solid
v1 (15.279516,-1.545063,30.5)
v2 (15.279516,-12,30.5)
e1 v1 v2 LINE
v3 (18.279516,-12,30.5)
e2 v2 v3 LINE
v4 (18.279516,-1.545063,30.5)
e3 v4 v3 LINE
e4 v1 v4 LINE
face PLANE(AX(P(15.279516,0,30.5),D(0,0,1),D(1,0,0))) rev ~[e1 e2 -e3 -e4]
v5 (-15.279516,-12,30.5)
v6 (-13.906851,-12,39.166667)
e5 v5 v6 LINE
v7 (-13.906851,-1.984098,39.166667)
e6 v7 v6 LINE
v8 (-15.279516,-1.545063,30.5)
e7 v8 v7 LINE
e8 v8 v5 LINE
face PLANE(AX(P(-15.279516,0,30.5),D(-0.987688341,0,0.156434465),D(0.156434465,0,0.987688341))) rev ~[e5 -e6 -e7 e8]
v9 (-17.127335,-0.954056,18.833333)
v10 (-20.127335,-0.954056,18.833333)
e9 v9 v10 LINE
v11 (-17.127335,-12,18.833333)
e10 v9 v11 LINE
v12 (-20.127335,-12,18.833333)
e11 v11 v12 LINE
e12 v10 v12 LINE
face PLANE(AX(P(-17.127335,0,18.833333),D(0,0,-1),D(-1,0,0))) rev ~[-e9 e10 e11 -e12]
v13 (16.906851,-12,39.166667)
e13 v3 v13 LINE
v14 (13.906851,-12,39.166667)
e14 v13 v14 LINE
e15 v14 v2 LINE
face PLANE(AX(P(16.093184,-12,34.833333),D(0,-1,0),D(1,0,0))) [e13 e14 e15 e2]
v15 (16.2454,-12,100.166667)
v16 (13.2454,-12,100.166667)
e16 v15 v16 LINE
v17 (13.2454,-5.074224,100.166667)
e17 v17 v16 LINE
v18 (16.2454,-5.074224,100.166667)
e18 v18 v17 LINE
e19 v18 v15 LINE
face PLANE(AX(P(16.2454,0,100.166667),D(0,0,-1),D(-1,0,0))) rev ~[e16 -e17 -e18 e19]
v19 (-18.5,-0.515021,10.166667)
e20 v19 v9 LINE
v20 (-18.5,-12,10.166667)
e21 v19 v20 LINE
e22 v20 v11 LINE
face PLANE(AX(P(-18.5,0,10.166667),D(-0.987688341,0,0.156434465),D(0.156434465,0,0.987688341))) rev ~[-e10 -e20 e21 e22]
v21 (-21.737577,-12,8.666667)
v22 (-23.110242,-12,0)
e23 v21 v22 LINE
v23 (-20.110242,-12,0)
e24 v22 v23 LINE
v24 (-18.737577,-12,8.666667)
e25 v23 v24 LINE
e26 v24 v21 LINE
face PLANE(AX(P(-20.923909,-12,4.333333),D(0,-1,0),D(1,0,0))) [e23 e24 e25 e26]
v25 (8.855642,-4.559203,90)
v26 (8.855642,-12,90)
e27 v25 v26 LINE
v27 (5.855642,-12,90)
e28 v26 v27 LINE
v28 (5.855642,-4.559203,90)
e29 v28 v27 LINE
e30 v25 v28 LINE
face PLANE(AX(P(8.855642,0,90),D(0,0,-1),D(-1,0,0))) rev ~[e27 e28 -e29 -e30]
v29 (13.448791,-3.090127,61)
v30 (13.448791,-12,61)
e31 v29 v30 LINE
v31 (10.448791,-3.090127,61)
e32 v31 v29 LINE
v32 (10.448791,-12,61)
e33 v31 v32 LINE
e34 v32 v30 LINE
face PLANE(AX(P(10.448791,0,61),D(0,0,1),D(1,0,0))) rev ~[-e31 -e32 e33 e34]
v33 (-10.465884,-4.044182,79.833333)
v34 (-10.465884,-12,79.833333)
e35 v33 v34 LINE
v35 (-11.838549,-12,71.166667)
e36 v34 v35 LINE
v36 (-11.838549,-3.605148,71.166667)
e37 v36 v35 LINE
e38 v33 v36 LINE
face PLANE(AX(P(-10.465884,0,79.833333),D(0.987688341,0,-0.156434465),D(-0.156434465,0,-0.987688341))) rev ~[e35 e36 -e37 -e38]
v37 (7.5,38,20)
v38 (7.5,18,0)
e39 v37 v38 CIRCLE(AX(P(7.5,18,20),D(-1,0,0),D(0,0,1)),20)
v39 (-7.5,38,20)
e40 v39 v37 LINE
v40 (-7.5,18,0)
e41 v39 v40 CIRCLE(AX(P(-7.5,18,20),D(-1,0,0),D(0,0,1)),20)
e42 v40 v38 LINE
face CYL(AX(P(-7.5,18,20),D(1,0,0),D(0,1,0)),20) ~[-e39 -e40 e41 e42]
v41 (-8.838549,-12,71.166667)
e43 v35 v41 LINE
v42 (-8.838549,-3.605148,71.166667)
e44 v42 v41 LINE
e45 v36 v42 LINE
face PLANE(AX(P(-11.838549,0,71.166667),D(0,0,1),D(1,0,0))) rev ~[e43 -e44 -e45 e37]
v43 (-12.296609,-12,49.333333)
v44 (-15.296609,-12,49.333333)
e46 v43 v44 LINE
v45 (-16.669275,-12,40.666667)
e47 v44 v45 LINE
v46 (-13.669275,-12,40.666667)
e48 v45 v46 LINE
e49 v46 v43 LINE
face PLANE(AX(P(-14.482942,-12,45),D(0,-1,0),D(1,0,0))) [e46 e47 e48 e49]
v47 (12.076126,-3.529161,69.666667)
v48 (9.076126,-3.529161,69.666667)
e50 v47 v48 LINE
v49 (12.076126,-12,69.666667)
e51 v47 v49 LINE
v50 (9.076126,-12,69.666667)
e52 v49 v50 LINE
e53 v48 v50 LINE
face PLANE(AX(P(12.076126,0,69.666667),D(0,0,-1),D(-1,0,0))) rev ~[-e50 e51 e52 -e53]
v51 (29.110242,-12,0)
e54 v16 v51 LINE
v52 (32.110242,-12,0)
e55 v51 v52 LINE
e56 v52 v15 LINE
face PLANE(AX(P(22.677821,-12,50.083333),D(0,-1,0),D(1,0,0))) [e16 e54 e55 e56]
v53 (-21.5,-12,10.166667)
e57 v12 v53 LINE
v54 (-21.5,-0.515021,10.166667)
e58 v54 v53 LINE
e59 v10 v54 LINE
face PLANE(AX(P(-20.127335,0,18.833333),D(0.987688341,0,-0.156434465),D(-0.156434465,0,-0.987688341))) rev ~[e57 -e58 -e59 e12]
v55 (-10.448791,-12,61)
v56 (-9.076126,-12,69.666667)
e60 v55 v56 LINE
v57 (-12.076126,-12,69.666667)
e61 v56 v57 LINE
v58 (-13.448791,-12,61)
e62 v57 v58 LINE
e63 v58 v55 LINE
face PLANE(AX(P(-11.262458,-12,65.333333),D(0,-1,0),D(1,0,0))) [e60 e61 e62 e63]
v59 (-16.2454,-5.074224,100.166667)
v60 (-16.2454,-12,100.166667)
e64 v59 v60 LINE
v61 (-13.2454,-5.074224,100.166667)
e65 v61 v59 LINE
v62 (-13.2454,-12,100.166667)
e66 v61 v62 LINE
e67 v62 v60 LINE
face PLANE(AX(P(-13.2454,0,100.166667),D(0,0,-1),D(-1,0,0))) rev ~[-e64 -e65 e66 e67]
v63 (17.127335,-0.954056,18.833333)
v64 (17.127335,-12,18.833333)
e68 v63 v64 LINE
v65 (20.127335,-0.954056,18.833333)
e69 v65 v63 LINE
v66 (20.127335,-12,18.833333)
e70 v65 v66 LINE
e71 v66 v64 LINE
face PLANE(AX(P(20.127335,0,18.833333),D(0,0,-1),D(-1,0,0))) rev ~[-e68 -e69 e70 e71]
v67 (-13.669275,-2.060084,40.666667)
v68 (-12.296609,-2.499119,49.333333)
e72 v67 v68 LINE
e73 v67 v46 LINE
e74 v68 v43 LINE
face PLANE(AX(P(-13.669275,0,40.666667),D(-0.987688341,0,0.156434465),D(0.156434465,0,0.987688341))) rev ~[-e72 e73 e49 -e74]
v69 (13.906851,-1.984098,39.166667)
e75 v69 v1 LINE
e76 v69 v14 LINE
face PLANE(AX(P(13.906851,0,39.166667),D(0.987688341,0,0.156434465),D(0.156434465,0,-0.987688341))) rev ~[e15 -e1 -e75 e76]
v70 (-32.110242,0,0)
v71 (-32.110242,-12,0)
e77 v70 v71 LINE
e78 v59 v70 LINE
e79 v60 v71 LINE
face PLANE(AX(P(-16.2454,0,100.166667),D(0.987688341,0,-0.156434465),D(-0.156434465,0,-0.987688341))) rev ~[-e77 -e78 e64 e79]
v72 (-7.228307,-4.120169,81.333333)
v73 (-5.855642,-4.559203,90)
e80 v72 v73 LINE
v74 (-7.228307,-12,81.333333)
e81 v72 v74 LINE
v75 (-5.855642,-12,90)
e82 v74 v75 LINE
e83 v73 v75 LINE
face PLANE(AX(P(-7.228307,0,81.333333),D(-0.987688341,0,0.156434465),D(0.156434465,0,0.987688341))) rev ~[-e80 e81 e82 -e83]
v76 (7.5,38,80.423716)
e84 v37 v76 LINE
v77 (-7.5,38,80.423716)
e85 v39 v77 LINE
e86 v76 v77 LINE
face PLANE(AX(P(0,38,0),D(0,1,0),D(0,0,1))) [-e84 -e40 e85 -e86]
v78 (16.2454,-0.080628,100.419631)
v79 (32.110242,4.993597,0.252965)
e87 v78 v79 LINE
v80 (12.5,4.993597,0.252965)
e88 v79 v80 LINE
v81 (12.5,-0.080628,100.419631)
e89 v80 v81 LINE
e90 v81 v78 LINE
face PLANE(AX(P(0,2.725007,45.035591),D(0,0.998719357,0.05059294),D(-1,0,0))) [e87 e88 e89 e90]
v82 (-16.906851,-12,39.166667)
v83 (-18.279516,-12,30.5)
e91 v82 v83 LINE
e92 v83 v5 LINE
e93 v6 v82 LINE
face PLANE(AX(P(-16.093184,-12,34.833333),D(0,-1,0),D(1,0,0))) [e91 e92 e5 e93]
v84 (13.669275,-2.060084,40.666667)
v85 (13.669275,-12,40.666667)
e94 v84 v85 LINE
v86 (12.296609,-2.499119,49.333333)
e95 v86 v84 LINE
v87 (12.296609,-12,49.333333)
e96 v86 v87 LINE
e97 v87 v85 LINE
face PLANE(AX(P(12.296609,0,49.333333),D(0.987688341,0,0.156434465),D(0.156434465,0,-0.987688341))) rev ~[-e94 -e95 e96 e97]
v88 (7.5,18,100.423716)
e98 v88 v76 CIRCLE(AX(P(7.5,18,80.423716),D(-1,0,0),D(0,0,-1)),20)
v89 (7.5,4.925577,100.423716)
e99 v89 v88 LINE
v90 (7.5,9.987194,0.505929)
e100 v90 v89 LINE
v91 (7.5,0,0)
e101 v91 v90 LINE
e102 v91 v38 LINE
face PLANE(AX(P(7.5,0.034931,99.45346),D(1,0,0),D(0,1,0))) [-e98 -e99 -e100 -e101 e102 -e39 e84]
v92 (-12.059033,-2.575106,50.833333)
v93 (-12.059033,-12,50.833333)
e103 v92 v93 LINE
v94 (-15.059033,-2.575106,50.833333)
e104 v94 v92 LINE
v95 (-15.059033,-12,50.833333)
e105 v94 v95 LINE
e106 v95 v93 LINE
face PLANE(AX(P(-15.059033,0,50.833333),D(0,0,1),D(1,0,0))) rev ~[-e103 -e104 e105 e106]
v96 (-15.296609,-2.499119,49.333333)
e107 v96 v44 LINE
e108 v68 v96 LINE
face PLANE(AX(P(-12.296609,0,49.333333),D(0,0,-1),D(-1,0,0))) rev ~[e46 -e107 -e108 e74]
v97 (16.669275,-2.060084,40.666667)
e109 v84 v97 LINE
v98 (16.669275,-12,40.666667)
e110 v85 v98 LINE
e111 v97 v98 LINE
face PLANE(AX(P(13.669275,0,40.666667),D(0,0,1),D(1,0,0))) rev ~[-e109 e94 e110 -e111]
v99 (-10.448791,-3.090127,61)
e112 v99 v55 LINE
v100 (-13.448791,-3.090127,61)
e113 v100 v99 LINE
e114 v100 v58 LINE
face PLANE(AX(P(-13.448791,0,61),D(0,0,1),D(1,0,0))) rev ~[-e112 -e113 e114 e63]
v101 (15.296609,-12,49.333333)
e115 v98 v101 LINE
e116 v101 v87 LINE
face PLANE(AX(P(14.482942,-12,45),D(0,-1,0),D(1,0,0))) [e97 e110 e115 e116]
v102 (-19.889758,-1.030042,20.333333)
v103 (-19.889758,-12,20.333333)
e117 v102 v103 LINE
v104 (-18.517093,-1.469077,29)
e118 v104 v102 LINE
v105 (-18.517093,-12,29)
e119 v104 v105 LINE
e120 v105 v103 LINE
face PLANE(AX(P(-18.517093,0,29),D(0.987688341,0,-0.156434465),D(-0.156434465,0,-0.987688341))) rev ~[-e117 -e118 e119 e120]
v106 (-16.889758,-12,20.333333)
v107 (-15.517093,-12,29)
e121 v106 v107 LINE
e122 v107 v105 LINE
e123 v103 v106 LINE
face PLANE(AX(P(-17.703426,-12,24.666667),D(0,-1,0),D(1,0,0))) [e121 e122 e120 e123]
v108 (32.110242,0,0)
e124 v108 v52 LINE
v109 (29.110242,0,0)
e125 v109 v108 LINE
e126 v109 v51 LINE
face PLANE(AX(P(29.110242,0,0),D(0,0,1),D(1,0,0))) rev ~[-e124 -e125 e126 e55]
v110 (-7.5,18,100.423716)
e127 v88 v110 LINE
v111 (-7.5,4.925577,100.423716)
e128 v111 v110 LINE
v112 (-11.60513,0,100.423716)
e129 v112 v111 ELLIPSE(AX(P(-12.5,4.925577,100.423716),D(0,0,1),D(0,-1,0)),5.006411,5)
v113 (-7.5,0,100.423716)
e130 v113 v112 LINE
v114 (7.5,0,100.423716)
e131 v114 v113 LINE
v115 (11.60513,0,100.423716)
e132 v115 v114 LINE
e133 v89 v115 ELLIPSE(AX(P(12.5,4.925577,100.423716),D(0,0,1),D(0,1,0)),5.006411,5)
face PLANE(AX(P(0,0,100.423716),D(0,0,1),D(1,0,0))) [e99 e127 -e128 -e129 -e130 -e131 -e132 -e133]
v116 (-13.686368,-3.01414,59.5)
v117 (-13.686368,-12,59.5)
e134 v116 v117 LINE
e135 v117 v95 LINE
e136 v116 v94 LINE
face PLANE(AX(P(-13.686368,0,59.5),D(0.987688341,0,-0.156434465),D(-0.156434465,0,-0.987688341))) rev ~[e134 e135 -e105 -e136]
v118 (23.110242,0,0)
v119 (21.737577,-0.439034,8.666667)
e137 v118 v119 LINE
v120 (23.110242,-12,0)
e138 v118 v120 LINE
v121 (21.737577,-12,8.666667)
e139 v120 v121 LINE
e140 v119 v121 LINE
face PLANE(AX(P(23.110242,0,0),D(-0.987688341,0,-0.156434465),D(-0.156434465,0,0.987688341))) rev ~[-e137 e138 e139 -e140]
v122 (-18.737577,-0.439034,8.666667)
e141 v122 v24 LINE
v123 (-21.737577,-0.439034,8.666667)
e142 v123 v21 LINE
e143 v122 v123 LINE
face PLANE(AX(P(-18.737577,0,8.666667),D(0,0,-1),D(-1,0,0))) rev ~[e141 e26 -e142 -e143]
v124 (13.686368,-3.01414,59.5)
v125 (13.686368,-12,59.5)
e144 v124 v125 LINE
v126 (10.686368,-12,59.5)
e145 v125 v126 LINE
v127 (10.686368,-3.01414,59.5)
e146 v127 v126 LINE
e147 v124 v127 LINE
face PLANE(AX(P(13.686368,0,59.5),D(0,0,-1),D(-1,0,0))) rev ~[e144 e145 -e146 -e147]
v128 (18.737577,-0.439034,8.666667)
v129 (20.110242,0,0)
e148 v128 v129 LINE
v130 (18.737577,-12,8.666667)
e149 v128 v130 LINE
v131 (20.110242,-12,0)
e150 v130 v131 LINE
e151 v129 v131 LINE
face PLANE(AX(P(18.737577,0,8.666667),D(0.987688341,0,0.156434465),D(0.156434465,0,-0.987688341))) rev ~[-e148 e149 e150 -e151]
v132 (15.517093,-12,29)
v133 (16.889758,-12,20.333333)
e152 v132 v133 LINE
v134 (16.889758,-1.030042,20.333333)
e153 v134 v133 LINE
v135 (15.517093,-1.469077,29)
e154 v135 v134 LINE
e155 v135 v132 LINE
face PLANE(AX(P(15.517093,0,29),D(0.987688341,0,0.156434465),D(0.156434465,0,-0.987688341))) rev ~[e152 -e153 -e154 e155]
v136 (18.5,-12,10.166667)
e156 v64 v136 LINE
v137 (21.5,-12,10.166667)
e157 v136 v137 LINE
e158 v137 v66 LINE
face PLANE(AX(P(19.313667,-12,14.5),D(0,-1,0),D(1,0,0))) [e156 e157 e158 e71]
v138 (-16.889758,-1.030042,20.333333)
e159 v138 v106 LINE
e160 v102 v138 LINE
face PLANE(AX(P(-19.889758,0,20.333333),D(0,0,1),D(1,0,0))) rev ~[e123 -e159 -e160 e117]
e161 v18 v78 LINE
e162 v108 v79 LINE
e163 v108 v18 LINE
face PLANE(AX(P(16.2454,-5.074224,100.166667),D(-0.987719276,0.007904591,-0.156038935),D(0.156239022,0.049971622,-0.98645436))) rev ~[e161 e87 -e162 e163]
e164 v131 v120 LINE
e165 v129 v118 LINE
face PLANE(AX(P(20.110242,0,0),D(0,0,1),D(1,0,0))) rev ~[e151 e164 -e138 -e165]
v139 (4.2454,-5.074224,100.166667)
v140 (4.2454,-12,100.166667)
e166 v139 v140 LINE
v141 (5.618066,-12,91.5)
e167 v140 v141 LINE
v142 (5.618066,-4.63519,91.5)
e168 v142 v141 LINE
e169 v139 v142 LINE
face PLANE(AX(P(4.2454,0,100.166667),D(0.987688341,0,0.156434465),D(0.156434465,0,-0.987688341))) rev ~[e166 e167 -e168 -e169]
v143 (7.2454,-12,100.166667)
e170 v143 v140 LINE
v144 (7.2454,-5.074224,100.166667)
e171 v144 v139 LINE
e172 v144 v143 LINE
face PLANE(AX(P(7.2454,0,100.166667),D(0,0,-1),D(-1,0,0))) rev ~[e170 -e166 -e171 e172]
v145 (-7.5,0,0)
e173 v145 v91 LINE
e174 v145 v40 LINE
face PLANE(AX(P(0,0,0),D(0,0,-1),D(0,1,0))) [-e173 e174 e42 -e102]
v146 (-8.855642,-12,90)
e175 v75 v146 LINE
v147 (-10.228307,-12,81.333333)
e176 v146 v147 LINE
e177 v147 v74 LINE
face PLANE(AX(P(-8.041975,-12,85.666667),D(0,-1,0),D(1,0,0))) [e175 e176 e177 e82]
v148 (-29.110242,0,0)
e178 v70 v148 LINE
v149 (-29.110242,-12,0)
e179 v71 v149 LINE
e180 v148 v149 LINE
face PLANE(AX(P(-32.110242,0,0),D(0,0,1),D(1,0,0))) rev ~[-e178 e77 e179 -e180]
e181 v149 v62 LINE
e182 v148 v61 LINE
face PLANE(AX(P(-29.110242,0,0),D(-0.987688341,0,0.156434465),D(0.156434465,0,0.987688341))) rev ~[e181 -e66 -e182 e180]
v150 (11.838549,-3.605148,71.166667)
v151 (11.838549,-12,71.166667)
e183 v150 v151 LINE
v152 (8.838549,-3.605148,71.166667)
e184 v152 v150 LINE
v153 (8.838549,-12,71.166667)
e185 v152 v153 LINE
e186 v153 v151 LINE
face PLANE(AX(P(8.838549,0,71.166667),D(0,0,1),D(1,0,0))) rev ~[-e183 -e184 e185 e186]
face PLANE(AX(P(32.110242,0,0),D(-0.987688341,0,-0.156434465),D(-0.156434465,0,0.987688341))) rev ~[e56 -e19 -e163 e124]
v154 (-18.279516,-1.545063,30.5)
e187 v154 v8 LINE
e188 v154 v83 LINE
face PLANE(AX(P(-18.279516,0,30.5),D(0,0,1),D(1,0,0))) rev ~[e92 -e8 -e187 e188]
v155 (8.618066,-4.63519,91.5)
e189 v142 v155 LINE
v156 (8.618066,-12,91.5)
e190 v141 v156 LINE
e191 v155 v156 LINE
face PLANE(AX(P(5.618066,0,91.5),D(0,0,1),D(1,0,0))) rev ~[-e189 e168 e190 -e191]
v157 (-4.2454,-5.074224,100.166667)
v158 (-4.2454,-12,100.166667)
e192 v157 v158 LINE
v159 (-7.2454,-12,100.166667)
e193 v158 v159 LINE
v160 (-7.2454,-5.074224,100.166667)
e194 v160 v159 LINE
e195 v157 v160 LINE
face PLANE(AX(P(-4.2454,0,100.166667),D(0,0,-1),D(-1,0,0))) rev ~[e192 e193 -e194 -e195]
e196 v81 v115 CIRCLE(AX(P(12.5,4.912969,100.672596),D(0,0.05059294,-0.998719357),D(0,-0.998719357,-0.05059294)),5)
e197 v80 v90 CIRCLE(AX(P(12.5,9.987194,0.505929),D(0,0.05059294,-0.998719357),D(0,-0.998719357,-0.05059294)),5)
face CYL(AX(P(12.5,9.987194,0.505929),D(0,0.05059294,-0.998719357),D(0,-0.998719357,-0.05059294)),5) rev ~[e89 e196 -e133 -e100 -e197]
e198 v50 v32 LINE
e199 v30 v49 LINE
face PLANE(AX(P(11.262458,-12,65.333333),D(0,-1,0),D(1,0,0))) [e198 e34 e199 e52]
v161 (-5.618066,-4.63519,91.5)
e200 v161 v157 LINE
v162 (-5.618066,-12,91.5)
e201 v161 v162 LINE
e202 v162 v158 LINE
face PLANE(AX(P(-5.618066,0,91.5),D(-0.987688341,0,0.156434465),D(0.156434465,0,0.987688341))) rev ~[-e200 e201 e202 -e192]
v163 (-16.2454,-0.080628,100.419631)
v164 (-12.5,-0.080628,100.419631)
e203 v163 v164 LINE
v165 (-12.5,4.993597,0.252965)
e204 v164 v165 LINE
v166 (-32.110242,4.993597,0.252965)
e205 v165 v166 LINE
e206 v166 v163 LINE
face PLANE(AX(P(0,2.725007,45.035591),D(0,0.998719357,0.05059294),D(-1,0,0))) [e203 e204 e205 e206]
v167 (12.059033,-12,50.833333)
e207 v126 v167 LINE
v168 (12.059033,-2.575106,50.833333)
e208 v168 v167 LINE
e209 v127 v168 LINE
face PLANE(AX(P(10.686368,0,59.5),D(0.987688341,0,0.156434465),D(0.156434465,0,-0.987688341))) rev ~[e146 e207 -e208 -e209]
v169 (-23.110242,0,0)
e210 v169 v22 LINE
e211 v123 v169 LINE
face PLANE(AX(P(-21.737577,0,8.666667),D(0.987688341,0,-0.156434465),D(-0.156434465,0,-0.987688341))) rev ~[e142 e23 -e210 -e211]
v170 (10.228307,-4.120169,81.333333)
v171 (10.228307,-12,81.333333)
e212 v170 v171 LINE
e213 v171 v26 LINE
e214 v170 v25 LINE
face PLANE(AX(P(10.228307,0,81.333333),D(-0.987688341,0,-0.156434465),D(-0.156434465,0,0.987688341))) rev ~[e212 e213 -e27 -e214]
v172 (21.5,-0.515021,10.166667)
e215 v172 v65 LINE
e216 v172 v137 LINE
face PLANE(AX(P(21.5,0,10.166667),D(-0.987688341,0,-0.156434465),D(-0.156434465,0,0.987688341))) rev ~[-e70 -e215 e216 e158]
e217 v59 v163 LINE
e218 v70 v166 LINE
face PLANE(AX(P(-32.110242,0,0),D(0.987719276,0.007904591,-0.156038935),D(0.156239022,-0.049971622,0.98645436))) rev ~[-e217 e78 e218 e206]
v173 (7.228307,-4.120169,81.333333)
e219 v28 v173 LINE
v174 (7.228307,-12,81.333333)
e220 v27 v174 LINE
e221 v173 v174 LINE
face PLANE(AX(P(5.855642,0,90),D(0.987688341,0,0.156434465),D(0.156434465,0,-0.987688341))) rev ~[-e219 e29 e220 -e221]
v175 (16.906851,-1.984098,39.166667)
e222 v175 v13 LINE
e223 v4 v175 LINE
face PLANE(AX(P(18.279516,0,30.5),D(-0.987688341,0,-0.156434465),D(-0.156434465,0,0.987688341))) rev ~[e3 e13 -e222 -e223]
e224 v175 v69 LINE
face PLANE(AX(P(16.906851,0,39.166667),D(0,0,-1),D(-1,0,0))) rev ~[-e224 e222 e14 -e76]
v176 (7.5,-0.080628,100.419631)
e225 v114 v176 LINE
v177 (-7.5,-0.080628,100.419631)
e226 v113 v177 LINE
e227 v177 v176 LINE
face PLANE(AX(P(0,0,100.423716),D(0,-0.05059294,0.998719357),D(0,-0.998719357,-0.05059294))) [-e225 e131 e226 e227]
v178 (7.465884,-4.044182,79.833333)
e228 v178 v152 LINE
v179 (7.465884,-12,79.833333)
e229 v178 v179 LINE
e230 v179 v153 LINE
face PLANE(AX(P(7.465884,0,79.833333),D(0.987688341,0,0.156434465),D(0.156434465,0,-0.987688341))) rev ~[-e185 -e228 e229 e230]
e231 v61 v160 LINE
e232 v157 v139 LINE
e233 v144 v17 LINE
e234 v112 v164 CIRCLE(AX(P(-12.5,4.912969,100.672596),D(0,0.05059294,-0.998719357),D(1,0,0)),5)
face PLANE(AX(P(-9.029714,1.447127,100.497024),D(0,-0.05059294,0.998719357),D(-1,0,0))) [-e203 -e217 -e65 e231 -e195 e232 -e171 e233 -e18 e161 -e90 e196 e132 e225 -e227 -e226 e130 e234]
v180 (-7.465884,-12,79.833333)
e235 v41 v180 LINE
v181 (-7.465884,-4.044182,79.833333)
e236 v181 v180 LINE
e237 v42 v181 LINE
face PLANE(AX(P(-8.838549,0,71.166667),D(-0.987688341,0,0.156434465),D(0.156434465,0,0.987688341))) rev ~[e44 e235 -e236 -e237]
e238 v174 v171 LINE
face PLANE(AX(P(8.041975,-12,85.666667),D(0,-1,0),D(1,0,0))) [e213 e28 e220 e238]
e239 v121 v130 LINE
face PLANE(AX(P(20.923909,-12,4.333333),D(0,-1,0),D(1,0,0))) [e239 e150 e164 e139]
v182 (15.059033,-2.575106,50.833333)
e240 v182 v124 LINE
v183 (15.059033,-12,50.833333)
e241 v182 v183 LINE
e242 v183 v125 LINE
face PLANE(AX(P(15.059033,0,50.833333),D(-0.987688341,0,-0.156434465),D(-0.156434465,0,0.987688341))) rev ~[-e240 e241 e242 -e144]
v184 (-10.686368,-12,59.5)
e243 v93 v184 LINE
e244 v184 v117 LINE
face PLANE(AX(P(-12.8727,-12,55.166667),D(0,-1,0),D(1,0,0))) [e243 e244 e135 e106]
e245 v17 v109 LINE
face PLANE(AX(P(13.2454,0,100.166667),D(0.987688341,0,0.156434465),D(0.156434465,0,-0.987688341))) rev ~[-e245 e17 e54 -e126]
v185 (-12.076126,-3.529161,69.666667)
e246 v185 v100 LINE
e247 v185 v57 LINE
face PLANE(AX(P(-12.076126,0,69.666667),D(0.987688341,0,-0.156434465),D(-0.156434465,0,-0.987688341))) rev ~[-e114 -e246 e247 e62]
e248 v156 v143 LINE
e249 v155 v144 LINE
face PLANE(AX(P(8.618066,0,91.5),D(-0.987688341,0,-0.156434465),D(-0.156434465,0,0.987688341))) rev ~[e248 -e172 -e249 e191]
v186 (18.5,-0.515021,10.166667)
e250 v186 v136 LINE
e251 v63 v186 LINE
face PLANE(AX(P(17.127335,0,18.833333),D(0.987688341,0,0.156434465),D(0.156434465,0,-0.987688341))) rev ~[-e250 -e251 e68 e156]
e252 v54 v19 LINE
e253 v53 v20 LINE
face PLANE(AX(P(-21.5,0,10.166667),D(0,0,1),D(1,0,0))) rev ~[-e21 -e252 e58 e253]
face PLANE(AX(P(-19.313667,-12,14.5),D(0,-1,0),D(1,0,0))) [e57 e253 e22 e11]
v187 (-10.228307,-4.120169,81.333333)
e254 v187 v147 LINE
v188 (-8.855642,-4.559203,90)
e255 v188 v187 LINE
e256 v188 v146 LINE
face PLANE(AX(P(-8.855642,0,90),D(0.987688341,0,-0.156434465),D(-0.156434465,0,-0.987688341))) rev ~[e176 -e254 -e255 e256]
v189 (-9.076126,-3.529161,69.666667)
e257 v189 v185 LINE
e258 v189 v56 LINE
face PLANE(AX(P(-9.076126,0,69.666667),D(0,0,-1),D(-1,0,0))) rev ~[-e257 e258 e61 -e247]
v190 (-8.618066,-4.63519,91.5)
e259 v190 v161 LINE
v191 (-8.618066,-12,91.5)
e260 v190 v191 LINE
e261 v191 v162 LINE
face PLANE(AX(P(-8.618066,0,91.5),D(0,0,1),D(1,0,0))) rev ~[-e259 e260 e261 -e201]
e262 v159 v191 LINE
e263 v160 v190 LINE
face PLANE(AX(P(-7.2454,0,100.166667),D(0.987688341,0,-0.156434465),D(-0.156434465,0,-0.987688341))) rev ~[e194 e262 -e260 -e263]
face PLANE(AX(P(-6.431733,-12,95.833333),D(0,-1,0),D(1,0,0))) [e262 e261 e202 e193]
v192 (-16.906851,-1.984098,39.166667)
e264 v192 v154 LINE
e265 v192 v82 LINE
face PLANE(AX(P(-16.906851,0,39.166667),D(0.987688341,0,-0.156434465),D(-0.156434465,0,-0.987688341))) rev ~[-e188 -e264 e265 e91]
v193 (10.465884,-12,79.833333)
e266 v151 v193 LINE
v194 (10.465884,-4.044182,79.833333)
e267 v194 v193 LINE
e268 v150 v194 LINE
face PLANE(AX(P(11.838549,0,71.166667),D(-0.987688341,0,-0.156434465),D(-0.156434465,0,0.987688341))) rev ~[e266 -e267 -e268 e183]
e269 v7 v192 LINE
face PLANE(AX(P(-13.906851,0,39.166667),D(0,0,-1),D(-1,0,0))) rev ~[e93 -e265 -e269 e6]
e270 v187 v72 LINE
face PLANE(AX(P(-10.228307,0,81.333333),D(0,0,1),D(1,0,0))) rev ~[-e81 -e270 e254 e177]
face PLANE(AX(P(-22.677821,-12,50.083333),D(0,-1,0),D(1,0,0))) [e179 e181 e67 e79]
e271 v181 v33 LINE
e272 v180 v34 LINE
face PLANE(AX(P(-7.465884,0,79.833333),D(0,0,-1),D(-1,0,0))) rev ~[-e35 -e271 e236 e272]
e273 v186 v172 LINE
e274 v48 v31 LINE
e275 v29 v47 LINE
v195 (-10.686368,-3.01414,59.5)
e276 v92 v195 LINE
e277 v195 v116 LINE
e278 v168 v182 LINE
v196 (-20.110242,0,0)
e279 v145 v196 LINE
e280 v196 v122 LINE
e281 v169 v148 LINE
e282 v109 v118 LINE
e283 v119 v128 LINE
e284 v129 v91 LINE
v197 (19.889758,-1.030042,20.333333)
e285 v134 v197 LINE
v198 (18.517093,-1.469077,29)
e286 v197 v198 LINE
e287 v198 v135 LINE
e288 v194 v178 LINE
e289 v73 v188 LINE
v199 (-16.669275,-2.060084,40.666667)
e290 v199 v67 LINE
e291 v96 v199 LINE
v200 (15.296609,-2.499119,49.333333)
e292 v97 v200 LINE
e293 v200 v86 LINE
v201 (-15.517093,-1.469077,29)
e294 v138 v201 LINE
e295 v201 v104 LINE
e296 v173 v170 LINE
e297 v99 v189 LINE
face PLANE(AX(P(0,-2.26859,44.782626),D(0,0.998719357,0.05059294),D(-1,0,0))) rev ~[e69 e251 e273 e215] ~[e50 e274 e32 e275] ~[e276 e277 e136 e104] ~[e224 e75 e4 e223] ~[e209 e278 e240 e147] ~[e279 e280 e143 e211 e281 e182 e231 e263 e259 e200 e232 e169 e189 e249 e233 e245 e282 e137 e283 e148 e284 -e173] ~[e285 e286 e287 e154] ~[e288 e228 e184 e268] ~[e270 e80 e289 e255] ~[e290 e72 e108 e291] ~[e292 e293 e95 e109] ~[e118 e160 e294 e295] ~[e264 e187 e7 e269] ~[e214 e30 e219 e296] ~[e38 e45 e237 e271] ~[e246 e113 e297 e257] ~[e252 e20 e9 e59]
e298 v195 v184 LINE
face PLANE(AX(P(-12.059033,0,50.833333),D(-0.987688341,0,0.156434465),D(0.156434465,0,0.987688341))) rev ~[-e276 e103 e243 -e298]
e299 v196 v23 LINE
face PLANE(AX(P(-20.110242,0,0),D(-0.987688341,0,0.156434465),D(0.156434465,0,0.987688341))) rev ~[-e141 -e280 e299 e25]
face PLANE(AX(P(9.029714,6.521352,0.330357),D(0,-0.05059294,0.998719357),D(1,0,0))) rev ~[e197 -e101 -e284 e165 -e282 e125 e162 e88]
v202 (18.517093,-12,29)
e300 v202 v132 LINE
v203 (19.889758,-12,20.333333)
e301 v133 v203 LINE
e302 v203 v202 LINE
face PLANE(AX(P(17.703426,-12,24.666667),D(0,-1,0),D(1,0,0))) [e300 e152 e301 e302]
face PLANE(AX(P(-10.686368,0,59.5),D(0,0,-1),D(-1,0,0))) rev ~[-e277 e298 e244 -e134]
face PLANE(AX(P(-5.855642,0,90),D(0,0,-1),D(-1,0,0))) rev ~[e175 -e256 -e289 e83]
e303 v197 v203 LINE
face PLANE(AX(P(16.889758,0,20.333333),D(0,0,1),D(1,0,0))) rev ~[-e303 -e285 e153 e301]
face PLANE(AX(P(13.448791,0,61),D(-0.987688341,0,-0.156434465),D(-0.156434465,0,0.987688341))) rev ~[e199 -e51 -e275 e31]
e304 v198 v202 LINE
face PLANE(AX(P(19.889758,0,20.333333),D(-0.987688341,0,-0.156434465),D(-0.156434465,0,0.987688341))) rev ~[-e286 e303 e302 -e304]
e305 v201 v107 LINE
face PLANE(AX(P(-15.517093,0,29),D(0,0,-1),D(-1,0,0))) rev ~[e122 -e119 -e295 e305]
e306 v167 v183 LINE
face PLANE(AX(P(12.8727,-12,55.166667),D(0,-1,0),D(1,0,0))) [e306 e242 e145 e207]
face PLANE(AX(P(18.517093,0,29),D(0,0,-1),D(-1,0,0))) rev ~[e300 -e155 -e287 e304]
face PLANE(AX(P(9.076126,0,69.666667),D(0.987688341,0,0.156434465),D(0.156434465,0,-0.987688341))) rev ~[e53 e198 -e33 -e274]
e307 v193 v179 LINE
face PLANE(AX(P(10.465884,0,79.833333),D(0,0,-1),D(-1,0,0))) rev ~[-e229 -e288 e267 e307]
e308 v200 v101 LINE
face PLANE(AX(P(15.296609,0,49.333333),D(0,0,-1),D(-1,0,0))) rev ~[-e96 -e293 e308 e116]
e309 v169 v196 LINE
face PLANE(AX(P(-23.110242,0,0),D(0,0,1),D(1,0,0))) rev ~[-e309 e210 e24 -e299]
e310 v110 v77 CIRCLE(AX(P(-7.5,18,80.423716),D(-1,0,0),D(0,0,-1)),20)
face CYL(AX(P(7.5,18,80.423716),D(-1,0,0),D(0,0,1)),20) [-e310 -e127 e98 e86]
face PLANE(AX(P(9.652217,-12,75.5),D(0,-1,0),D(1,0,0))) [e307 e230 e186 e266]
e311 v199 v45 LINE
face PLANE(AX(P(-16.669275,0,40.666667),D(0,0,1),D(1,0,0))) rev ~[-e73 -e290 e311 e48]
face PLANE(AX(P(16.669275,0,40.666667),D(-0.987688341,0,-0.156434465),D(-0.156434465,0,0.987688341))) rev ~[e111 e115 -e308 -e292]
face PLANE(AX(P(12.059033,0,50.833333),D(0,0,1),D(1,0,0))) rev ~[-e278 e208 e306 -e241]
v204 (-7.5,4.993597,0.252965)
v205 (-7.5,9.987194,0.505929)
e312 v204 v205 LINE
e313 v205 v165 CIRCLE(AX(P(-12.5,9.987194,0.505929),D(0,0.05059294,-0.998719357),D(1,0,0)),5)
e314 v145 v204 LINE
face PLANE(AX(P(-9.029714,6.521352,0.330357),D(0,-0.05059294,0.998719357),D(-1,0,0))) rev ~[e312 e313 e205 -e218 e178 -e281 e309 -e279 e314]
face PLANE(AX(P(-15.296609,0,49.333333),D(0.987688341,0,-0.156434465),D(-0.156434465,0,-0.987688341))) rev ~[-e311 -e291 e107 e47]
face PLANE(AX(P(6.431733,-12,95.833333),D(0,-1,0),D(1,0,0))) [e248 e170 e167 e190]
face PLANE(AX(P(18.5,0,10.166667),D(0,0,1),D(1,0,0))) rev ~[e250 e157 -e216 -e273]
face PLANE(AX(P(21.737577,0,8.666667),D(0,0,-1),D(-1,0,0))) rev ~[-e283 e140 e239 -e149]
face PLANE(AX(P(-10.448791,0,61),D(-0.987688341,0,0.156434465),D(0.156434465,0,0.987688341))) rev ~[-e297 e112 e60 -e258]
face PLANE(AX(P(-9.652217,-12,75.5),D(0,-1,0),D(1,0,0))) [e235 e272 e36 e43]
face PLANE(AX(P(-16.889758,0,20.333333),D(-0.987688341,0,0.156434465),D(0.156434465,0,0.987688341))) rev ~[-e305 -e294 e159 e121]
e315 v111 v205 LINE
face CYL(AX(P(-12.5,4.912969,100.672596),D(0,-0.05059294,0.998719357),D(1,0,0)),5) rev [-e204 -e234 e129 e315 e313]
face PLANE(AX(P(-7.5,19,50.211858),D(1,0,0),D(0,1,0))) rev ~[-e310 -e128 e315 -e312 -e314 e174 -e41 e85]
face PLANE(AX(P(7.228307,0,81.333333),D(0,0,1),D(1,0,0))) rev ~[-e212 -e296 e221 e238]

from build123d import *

# Parameters (mm, degrees)
F1_DEPTH     = 12
F3_DEPTH     = 40
F5_DEPTH     = 5
F6_W         = 38
F6_H         = 100.4237157875
F7_DEPTH     = 7.5
F9_DEPTH     = 7.5
F10_T4_DEPTH = 100.2951088773
F10_T9_DEPTH = 100.2951088773
F11_R        = 20


# Not quite as in the source:
# - a fillet or chamfer that OpenCascade refuses, or shapes differently, is made with other operations: its cross-section is extruded or revolved along the edge and cut away or added


with BuildPart() as f1:
    # F0 (on Front) → F1 (new body)
    with BuildSketch(Plane.XZ):
        Polygon((-18.7375766605, 8.6666666667), (-21.7375766605, 8.6666666667), (-23.11024181, 0), (-20.11024181, 0), align=None)
    extrude(amount=F1_DEPTH)


with BuildPart() as f1b:
    # F0 (on Front) → F1, piece 2 (new body)
    with BuildSketch(Plane.XZ):
        Polygon((21.7375766605, 8.6666666667), (18.7375766605, 8.6666666667), (20.11024181, 0), (23.11024181, 0), align=None)
    extrude(amount=F1_DEPTH)


with BuildPart() as f1c:
    # F0 (on Front) → F1, piece 3 (new body)
    with BuildSketch(Plane.XZ):
        Polygon((-20.1273348505, 18.8333333333), (-21.5, 10.1666666667), (-18.5, 10.1666666667), (-17.1273348505, 18.8333333333), align=None)
    extrude(amount=F1_DEPTH)


with BuildPart() as f1d:
    # F0 (on Front) → F1, piece 4 (new body)
    with BuildSketch(Plane.XZ):
        Polygon((17.1273348505, 18.8333333333), (18.5, 10.1666666667), (21.5, 10.1666666667), (20.1273348505, 18.8333333333), align=None)
    extrude(amount=F1_DEPTH)


with BuildPart() as f1e:
    # F0 (on Front) → F1, piece 5 (new body)
    with BuildSketch(Plane.XZ):
        Polygon((-15.5170930406, 29), (-18.5170930406, 29), (-19.88975819, 20.3333333333), (-16.88975819, 20.3333333333), align=None)
    extrude(amount=F1_DEPTH)


with BuildPart() as f1f:
    # F0 (on Front) → F1, piece 6 (new body)
    with BuildSketch(Plane.XZ):
        Polygon((16.88975819, 20.3333333333), (19.88975819, 20.3333333333), (18.5170930406, 29), (15.5170930406, 29), align=None)
    extrude(amount=F1_DEPTH)


with BuildPart() as f1g:
    # F0 (on Front) → F1, piece 7 (new body)
    with BuildSketch(Plane.XZ):
        Polygon((-15.2966094206, 49.3333333333), (-16.6692745701, 40.6666666667), (-13.6692745701, 40.6666666667), (-12.2966094206, 49.3333333333), align=None)
    extrude(amount=F1_DEPTH)


with BuildPart() as f1h:
    # F0 (on Front) → F1, piece 8 (new body)
    with BuildSketch(Plane.XZ):
        Polygon((-10.6863676107, 59.5), (-13.6863676107, 59.5), (-15.0590327601, 50.8333333333), (-12.0590327601, 50.8333333333), align=None)
    extrude(amount=F1_DEPTH)


with BuildPart() as f1i:
    # F0 (on Front) → F1, piece 9 (new body)
    with BuildSketch(Plane.XZ):
        Polygon((-11.8385491402, 71.1666666667), (-8.8385491402, 71.1666666667), (-7.4658839907, 79.8333333333), (-10.4658839907, 79.8333333333), align=None)
    extrude(amount=F1_DEPTH)


with BuildPart() as f1j:
    # F0 (on Front) → F1, piece 10 (new body)
    with BuildSketch(Plane.XZ):
        Polygon((-5.8556421808, 90), (-8.8556421808, 90), (-10.2283073302, 81.3333333333), (-7.2283073302, 81.3333333333), align=None)
    extrude(amount=F1_DEPTH)


with BuildPart() as f1k:
    # F0 (on Front) → F1, piece 11 (new body)
    with BuildSketch(Plane.XZ):
        Polygon((-4.2454003708, 100.1666666667), (-7.2454003708, 100.1666666667), (-8.6180655203, 91.5), (-5.6180655203, 91.5), align=None)
    extrude(amount=F1_DEPTH)


with BuildPart() as f1l:
    # F0 (on Front) → F1, piece 12 (new body)
    with BuildSketch(Plane.XZ):
        Polygon((16.9068512306, 39.1666666667), (13.9068512306, 39.1666666667), (15.2795163801, 30.5), (18.2795163801, 30.5), align=None)
    extrude(amount=F1_DEPTH)


with BuildPart() as f1m:
    # F0 (on Front) → F1, piece 13 (new body)
    with BuildSketch(Plane.XZ):
        Polygon((15.2966094206, 49.3333333333), (12.2966094206, 49.3333333333), (13.6692745701, 40.6666666667), (16.6692745701, 40.6666666667), align=None)
    extrude(amount=F1_DEPTH)


with BuildPart() as f1n:
    # F0 (on Front) → F1, piece 14 (new body)
    with BuildSketch(Plane.XZ):
        Polygon((13.6863676107, 59.5), (10.6863676107, 59.5), (12.0590327601, 50.8333333333), (15.0590327601, 50.8333333333), align=None)
    extrude(amount=F1_DEPTH)


with BuildPart() as f1o:
    # F0 (on Front) → F1, piece 15 (new body)
    with BuildSketch(Plane.XZ):
        Polygon((10.4487909502, 61), (13.4487909502, 61), (12.0761258007, 69.6666666667), (9.0761258007, 69.6666666667), align=None)
    extrude(amount=F1_DEPTH)


with BuildPart() as f1p:
    # F0 (on Front) → F1, piece 16 (new body)
    with BuildSketch(Plane.XZ):
        Polygon((10.4658839907, 79.8333333333), (7.4658839907, 79.8333333333), (8.8385491402, 71.1666666667), (11.8385491402, 71.1666666667), align=None)
    extrude(amount=F1_DEPTH)


with BuildPart() as f1q:
    # F0 (on Front) → F1, piece 17 (new body)
    with BuildSketch(Plane.XZ):
        Polygon((8.8556421808, 90), (5.8556421808, 90), (7.2283073302, 81.3333333333), (10.2283073302, 81.3333333333), align=None)
    extrude(amount=F1_DEPTH)


with BuildPart() as f1r:
    # F0 (on Front) → F1, piece 18 (new body)
    with BuildSketch(Plane.XZ):
        Polygon((-13.9068512306, 39.1666666667), (-16.9068512306, 39.1666666667), (-18.2795163801, 30.5), (-15.2795163801, 30.5), align=None)
    extrude(amount=F1_DEPTH)


with BuildPart() as f1s:
    # F0 (on Front) → F1, piece 19 (new body)
    with BuildSketch(Plane.XZ):
        Polygon((-12.0761258007, 69.6666666667), (-13.4487909502, 61), (-10.4487909502, 61), (-9.0761258007, 69.6666666667), align=None)
    extrude(amount=F1_DEPTH)


with BuildPart() as f1t:
    # F0 (on Front) → F1, piece 20 (new body)
    with BuildSketch(Plane.XZ):
        Polygon((7.2454003708, 100.1666666667), (4.2454003708, 100.1666666667), (5.6180655203, 91.5), (8.6180655203, 91.5), align=None)
    extrude(amount=F1_DEPTH)


with BuildPart() as f1u:
    # F0 (on Front) → F1, piece 21 (new body)
    with BuildSketch(Plane.XZ):
        Polygon((-29.11024181, 0), (-13.2454003708, 100.1666666667), (-16.2454003708, 100.1666666667), (-32.11024181, 0), align=None)
    extrude(amount=F1_DEPTH)


with BuildPart() as f1v:
    # F0 (on Front) → F1, piece 22 (new body)
    with BuildSketch(Plane.XZ):
        Polygon((16.2454003708, 100.1666666667), (13.2454003708, 100.1666666667), (29.11024181, 0), (32.11024181, 0), align=None)
    extrude(amount=F1_DEPTH)


with BuildPart() as f3_tool:
    # F2 (on Right) → F3 (new body, symmetric)
    with BuildSketch(Plane.YZ):
        Polygon((-5.0742244334, 100.1666666667), (0, 0), (0, 100.1666666667), align=None)
    extrude(amount=F3_DEPTH, both=True)


with BuildPart() as f1_1:
    add(f1.part)

    # F3: cut by f3_tool
    add(f3_tool.part, mode=Mode.SUBTRACT)



with BuildPart() as f1b_1:
    add(f1b.part)

    # F3: cut by f3_tool
    add(f3_tool.part, mode=Mode.SUBTRACT)


with BuildPart() as f1c_1:
    add(f1c.part)

    # F3: cut by f3_tool
    add(f3_tool.part, mode=Mode.SUBTRACT)


with BuildPart() as f1d_1:
    add(f1d.part)

    # F3: cut by f3_tool
    add(f3_tool.part, mode=Mode.SUBTRACT)


with BuildPart() as f1e_1:
    add(f1e.part)

    # F3: cut by f3_tool
    add(f3_tool.part, mode=Mode.SUBTRACT)


with BuildPart() as f1f_1:
    add(f1f.part)

    # F3: cut by f3_tool
    add(f3_tool.part, mode=Mode.SUBTRACT)


with BuildPart() as f1g_1:
    add(f1g.part)

    # F3: cut by f3_tool
    add(f3_tool.part, mode=Mode.SUBTRACT)


with BuildPart() as f1h_1:
    add(f1h.part)

    # F3: cut by f3_tool
    add(f3_tool.part, mode=Mode.SUBTRACT)


with BuildPart() as f1i_1:
    add(f1i.part)

    # F3: cut by f3_tool
    add(f3_tool.part, mode=Mode.SUBTRACT)


with BuildPart() as f1j_1:
    add(f1j.part)

    # F3: cut by f3_tool
    add(f3_tool.part, mode=Mode.SUBTRACT)


with BuildPart() as f1k_1:
    add(f1k.part)

    # F3: cut by f3_tool
    add(f3_tool.part, mode=Mode.SUBTRACT)


with BuildPart() as f1l_1:
    add(f1l.part)

    # F3: cut by f3_tool
    add(f3_tool.part, mode=Mode.SUBTRACT)


with BuildPart() as f1m_1:
    add(f1m.part)

    # F3: cut by f3_tool
    add(f3_tool.part, mode=Mode.SUBTRACT)


with BuildPart() as f1n_1:
    add(f1n.part)

    # F3: cut by f3_tool
    add(f3_tool.part, mode=Mode.SUBTRACT)


with BuildPart() as f1o_1:
    add(f1o.part)

    # F3: cut by f3_tool
    add(f3_tool.part, mode=Mode.SUBTRACT)


with BuildPart() as f1p_1:
    add(f1p.part)

    # F3: cut by f3_tool
    add(f3_tool.part, mode=Mode.SUBTRACT)


with BuildPart() as f1q_1:
    add(f1q.part)

    # F3: cut by f3_tool
    add(f3_tool.part, mode=Mode.SUBTRACT)


with BuildPart() as f1r_1:
    add(f1r.part)

    # F3: cut by f3_tool
    add(f3_tool.part, mode=Mode.SUBTRACT)


with BuildPart() as f1s_1:
    add(f1s.part)

    # F3: cut by f3_tool
    add(f3_tool.part, mode=Mode.SUBTRACT)


with BuildPart() as f1t_1:
    add(f1t.part)

    # F3: cut by f3_tool
    add(f3_tool.part, mode=Mode.SUBTRACT)


with BuildPart() as f1u_1:
    add(f1u.part)

    # F3: cut by f3_tool
    add(f3_tool.part, mode=Mode.SUBTRACT)


with BuildPart() as f1v_1:
    add(f1v.part)

    # F3: cut by f3_tool
    add(f3_tool.part, mode=Mode.SUBTRACT)


with BuildPart() as f1_2:
    add(f1_1.part)

    add(f1b_1.part)  # F5 merges F1b

    add(f1c_1.part)  # F5 merges F1c

    add(f1d_1.part)  # F5 merges F1d

    add(f1e_1.part)  # F5 merges F1e

    add(f1f_1.part)  # F5 merges F1f

    add(f1g_1.part)  # F5 merges F1g

    add(f1h_1.part)  # F5 merges F1h

    add(f1i_1.part)  # F5 merges F1i

    add(f1j_1.part)  # F5 merges F1j

    add(f1k_1.part)  # F5 merges F1k

    add(f1l_1.part)  # F5 merges F1l

    add(f1m_1.part)  # F5 merges F1m

    add(f1n_1.part)  # F5 merges F1n

    add(f1o_1.part)  # F5 merges F1o

    add(f1p_1.part)  # F5 merges F1p

    add(f1q_1.part)  # F5 merges F1q

    add(f1r_1.part)  # F5 merges F1r

    add(f1s_1.part)  # F5 merges F1s

    add(f1t_1.part)  # F5 merges F1t

    add(f1u_1.part)  # F5 merges F1u

    add(f1v_1.part)  # F5 merges F1v
    # F4 (on face) → F5 (join)
    with BuildSketch(Plane(origin=(0, 0, 0), x_dir=(-1, 0, 0), z_dir=(0, 0.9987193572, 0.0505929401))):
        Polygon((16.2454003708, 100.2951088773), (-16.2454003708, 100.2951088773), (-32.11024181, 0), (32.11024181, 0), align=None)
    extrude(amount=F5_DEPTH)

    # F6 (on Right) → F7 (join, symmetric)
    with BuildSketch(Plane.YZ):
        with Locations((19, 50.2118578937)):
            Rectangle(F6_W, F6_H)
    extrude(amount=F7_DEPTH, both=True)

    # F8 (on Right) → F9 (join, symmetric)
    with BuildSketch(Plane.YZ):
        Polygon((0.7220453882, 99.8437014869), (0, 100.4237157875), (-0.0806276475, 100.4196313671), (-0.4271789039, 99.9818352512), (-0.1710176838, 98.3370152763), align=None)
    extrude(amount=F9_DEPTH, both=True)

    # F10: fillet of radius 5 on 2 edges, made by hand


with BuildPart() as f10_tool2:
    # F10_s3 → F10_t4 (new body)
    with BuildSketch(Plane(origin=(0, 0, 0), x_dir=(1, 0, 0), z_dir=(0, -0.0505929401, 0.9987193572))):
        with BuildLine():
            ThreePointArc((12.5, 5), (8.9644660941, 6.4644660941), (7.5, 10))
            Line((7.5, 10), (7.5, 5))
            Line((7.5, 5), (12.5, 5))
        make_face()
    extrude(amount=F10_T4_DEPTH)

    split(bisect_by=Plane.XY.offset(100.4237157875), keep=Keep.BOTTOM)


with BuildPart() as f1_3:
    add(f1_2.part)

    # F10_t1: union F10_tool2
    add(f10_tool2.part)


with BuildPart() as f10_tool7:
    # F10_s8 → F10_t9 (new body)
    with BuildSketch(Plane(origin=(0, -5.0742244334, 100.1666666667), x_dir=(1, 0, 0), z_dir=(0, 0.0505929401, -0.9987193572))):
        with BuildLine():
            ThreePointArc((-7.5, -10), (-8.9644660941, -6.4644660941), (-12.5, -5))
            Line((-12.5, -5), (-7.5, -5))
            Line((-7.5, -5), (-7.5, -10))
        make_face()
    extrude(amount=F10_T9_DEPTH)

    split(bisect_by=Plane.XY.offset(100.4237157875), keep=Keep.BOTTOM)


with BuildPart() as f1_4:
    add(f1_3.part)

    # F10_t6: union F10_tool7
    add(f10_tool7.part)

    # F11
    f11_edges = [f1_4.edges().sort_by_distance(p)[0] for p in [
        (0, 38, 100.423716),
        (0, 38, 0),
    ]]
    fillet(f11_edges, radius=F11_R)


solid = f1_4.part
